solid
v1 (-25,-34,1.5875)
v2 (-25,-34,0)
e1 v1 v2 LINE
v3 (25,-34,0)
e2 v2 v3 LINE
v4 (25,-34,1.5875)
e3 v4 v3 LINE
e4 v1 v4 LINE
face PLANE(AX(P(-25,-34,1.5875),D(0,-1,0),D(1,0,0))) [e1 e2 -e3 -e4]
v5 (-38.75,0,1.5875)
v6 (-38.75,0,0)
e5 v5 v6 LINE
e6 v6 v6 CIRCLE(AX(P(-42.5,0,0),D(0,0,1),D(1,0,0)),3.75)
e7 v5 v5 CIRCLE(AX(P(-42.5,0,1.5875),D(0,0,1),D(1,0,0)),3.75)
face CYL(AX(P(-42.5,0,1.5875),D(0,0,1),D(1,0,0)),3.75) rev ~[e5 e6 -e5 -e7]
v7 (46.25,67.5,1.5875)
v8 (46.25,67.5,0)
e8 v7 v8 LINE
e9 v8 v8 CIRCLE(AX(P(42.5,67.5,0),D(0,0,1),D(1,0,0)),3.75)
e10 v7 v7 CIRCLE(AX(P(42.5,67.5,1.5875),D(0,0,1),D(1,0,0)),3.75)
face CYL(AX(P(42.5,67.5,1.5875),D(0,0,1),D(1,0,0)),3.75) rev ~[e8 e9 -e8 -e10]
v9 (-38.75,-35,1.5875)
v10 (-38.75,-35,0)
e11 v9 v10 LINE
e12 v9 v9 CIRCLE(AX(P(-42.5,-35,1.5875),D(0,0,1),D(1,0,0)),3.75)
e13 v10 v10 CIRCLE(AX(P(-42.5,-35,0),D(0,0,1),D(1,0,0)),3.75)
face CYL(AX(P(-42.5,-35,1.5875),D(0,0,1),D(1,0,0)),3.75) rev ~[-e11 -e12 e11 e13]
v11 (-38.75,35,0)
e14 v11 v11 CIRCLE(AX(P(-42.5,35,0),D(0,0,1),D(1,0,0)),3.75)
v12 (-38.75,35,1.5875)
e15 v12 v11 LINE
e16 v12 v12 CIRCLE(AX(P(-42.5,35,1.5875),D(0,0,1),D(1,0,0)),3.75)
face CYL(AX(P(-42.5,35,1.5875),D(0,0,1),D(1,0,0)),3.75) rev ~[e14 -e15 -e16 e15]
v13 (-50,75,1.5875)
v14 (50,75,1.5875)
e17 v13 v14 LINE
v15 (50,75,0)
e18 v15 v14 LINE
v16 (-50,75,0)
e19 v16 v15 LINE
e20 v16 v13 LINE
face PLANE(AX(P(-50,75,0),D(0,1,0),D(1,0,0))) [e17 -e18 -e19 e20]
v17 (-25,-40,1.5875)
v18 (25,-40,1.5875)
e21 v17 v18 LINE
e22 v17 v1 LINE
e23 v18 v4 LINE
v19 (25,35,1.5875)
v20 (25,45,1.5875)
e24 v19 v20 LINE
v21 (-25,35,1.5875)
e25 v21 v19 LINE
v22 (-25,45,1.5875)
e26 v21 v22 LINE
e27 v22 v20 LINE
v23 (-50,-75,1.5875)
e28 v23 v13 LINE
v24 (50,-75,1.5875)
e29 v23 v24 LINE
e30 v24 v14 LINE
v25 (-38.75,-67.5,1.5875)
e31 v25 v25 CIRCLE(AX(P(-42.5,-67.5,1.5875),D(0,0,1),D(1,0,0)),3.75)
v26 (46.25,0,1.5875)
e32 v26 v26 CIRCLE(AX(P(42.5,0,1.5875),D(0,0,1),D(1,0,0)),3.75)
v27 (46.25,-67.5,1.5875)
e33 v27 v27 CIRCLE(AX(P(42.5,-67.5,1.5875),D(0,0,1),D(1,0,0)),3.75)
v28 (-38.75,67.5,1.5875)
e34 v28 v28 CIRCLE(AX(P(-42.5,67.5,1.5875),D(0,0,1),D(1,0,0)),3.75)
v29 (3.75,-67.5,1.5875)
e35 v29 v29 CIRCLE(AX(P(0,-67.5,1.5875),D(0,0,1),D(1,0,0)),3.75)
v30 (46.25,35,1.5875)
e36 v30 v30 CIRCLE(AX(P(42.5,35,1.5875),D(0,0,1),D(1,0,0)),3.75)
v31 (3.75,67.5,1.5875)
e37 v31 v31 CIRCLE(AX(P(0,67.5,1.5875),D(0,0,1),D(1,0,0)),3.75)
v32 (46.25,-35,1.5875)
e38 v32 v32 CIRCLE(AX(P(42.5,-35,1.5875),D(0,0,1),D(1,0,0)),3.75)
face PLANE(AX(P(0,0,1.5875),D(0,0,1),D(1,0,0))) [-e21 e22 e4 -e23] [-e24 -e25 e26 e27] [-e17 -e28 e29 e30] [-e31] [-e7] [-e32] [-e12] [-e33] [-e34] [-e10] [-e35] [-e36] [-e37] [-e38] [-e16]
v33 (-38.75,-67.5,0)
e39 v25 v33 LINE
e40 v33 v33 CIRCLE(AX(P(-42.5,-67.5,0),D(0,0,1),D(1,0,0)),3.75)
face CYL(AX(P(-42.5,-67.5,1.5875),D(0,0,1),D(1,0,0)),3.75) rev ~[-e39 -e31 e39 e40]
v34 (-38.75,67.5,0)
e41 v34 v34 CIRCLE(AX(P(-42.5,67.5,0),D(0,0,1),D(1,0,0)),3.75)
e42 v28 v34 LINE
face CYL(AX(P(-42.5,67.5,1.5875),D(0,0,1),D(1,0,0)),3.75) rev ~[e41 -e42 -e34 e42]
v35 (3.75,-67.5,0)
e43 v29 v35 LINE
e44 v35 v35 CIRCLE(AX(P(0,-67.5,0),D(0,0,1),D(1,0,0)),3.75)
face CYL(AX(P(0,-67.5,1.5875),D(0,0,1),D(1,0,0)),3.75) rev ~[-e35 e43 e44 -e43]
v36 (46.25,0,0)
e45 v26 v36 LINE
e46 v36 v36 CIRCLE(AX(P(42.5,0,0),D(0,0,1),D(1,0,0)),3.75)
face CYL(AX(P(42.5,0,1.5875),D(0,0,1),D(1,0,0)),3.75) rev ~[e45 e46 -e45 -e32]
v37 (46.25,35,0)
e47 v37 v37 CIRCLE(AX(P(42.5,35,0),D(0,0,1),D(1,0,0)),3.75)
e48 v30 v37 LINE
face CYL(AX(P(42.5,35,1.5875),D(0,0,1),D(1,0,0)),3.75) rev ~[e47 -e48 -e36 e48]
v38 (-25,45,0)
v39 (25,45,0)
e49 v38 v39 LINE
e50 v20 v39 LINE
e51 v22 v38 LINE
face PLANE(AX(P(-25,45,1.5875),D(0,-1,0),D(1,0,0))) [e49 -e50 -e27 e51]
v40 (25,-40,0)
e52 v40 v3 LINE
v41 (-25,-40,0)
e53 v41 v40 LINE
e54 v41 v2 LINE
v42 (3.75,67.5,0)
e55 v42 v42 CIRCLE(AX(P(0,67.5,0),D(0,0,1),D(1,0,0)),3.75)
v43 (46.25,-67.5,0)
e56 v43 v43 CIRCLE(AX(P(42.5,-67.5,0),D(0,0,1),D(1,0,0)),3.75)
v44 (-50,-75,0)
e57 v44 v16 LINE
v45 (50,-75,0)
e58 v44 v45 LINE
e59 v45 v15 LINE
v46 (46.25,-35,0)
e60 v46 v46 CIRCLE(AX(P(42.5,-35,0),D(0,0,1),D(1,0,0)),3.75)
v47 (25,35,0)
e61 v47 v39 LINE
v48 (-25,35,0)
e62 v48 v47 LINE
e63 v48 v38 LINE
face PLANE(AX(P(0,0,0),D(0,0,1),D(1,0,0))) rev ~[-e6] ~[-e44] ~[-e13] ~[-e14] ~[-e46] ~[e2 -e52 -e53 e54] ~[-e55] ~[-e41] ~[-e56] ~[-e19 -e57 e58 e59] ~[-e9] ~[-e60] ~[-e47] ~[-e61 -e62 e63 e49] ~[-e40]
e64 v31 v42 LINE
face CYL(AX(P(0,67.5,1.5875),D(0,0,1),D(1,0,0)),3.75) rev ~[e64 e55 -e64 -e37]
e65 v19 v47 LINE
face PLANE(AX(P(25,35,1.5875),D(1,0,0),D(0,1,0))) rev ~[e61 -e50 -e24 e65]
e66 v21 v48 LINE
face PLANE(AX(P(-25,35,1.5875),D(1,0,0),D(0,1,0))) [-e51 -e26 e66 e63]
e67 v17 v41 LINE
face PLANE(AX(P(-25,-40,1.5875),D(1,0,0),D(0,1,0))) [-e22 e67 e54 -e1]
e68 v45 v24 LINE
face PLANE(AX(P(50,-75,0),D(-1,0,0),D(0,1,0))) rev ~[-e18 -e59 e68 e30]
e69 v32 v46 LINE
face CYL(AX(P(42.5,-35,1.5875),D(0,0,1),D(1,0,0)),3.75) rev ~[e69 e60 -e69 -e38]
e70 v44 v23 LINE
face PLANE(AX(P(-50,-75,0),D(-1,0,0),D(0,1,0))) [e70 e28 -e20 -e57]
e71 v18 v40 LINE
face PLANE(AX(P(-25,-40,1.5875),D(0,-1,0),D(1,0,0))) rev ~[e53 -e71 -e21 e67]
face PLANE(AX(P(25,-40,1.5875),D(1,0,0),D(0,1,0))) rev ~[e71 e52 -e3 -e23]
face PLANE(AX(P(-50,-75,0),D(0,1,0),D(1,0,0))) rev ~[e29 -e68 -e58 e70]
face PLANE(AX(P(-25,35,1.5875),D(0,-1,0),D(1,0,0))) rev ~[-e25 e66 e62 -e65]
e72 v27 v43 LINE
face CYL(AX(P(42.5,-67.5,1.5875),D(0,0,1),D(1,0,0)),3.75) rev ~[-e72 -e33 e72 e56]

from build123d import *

# Parameters (mm, degrees)
F0_W     = 100
F0_H     = 150
F1_DEPTH = 1.5875
F2_R     = 3.75
F3_DEPTH = 25
F4_W     = 50
F4_H     = 6
F5_DEPTH = 25
F6_W     = 50
F6_H     = 10
F7_DEPTH = 25


# Not quite as in the source:
# - a feature names something its author has since deleted; it is built from what else it names


with BuildPart() as f1:
    # F0 (on Top) → F1 (new body)
    with BuildSketch(Plane.XY):
        Rectangle(F0_W, F0_H)
    extrude(amount=F1_DEPTH)

    # F2 (on face) → F3 (cut)
    with BuildSketch(Plane.XY.offset(1.5875)):
        with Locations((-42.5, 67.5)):
            Circle(F2_R)
        with Locations((-42.5, 0)):
            Circle(F2_R)
        with Locations((-42.5, -35)):
            Circle(F2_R)
        with Locations((-42.5, -67.5)):
            Circle(F2_R)
        with Locations((0, -67.5)):
            Circle(F2_R)
        with Locations((-42.5, 35)):
            Circle(F2_R)
        with Locations((42.5, -67.5)):
            Circle(F2_R)
        with Locations((42.5, -35)):
            Circle(F2_R)
        with Locations((42.5, 0)):
            Circle(F2_R)
        with Locations((42.5, 35)):
            Circle(F2_R)
        with Locations((42.5, 67.5)):
            Circle(F2_R)
        with Locations((0, 67.5)):
            Circle(F2_R)
    extrude(amount=-F3_DEPTH, mode=Mode.SUBTRACT)

    # F4 (on face) → F5 (cut)
    with BuildSketch(Plane.XY.offset(1.5875)):
        with Locations((0, -37)):
            Rectangle(F4_W, F4_H)
    extrude(amount=-F5_DEPTH, mode=Mode.SUBTRACT)

    # F6 (on face) → F7 (cut)
    with BuildSketch(Plane.XY.offset(1.5875)):
        with Locations((0, 40)):
            Rectangle(F6_W, F6_H)
    extrude(amount=-F7_DEPTH, mode=Mode.SUBTRACT)


solid = f1.part
